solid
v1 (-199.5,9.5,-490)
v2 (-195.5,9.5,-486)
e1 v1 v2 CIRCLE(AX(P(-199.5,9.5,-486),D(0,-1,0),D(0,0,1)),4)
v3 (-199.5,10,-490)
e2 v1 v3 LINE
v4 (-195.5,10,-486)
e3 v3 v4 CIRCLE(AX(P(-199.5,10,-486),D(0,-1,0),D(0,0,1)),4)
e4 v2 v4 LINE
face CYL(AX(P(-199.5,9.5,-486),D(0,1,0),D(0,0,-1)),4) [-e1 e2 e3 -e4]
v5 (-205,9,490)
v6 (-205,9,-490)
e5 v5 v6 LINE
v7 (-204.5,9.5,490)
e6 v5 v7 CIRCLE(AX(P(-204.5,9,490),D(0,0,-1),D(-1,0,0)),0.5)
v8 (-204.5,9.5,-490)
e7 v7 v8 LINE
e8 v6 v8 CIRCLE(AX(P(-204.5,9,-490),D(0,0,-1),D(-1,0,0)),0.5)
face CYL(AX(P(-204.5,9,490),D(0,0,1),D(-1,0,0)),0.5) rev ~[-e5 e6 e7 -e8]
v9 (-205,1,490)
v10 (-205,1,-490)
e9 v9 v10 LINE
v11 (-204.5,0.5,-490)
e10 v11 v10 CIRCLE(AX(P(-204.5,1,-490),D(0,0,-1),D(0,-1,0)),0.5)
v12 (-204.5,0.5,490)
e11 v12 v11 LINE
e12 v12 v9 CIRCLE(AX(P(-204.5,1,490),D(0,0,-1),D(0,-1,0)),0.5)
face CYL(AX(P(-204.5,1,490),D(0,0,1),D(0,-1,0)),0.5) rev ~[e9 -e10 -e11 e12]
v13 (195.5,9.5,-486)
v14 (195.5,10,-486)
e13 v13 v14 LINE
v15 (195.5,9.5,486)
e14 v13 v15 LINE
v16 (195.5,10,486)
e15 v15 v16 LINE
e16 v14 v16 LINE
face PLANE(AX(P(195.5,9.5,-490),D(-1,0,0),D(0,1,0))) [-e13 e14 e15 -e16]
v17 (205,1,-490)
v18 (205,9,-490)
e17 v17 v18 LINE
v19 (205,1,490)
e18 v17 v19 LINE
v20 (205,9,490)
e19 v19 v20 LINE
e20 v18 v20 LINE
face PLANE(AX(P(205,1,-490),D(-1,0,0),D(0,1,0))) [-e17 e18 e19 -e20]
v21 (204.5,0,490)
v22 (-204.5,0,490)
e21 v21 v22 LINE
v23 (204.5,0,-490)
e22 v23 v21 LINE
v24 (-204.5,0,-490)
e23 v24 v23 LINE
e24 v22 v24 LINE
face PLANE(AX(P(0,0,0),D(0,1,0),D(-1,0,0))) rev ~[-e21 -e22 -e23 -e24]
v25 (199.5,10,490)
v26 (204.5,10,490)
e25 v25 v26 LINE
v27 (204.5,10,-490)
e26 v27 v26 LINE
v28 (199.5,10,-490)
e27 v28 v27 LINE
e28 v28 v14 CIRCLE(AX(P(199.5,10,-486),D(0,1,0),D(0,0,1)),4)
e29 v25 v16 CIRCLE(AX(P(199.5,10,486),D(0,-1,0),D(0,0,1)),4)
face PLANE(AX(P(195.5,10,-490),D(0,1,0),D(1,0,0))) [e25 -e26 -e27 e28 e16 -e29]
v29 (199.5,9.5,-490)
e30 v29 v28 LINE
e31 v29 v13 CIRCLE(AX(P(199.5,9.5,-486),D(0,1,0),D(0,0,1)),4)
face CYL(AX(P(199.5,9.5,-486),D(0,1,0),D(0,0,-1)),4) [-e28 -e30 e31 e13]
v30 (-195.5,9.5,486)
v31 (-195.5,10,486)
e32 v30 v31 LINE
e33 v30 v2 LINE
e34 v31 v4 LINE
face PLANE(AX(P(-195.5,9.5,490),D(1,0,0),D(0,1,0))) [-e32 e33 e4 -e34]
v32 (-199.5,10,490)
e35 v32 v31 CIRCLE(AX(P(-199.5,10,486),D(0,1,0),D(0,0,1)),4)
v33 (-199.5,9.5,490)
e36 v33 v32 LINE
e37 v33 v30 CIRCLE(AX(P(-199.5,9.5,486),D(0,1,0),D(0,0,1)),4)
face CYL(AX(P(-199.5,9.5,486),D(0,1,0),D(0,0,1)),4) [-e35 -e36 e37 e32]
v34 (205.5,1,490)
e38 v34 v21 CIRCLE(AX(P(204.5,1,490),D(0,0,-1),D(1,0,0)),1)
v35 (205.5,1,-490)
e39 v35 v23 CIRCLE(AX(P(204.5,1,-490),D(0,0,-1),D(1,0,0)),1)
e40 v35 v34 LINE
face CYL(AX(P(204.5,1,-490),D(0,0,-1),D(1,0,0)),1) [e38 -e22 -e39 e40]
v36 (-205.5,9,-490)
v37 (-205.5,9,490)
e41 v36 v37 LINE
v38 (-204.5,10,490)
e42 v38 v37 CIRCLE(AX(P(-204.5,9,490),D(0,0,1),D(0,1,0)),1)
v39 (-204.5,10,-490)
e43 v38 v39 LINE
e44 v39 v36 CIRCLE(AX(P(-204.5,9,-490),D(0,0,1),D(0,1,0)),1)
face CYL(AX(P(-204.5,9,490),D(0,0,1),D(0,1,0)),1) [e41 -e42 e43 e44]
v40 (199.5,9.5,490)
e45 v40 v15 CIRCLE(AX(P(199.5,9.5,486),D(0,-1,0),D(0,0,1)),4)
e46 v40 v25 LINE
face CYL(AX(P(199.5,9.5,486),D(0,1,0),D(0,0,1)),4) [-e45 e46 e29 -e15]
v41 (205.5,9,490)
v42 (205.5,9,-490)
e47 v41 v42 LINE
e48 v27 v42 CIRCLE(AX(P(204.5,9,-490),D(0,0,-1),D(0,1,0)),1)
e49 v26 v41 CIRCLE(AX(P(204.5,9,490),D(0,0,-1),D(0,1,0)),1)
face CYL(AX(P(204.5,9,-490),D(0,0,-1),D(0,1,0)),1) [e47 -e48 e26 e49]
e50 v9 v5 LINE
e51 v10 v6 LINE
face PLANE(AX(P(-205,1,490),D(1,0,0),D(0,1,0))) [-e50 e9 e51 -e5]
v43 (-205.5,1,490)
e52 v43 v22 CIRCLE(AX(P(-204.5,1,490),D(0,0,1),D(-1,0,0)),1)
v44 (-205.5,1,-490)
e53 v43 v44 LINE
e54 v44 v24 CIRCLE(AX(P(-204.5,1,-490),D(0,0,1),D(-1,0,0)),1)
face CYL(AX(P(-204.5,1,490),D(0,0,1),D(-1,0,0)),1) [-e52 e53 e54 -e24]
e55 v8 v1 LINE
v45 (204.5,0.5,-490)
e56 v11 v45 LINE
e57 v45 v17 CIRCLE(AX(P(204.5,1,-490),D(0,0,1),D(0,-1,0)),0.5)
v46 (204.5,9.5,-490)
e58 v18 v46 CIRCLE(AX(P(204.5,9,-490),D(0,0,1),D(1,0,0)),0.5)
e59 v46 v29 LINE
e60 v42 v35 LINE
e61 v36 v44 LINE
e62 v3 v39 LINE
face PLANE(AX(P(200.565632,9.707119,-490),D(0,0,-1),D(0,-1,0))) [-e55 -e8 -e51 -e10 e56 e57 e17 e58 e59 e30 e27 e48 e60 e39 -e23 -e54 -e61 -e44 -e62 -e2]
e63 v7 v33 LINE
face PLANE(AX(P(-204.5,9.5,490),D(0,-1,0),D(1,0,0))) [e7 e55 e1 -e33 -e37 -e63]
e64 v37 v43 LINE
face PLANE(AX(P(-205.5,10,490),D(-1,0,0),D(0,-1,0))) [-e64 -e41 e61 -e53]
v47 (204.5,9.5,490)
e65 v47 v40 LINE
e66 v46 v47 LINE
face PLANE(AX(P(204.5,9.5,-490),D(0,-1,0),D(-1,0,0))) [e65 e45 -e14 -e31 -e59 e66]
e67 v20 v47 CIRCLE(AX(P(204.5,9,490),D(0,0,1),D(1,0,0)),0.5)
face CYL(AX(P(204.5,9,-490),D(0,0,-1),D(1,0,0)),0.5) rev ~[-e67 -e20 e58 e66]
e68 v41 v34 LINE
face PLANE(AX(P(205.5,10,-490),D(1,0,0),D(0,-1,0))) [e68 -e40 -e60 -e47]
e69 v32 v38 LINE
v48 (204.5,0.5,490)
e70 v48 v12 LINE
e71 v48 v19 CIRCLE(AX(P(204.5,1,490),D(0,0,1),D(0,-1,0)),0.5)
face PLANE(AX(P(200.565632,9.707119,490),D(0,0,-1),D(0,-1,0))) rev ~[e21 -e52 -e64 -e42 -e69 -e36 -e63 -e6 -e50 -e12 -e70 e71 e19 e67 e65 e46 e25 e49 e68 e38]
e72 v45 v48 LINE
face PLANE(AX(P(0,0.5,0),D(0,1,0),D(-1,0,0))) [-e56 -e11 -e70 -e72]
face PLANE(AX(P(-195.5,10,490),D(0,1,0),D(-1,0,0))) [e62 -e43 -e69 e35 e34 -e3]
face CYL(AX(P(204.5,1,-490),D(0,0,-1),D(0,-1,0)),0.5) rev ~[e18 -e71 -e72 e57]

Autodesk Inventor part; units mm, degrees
ref_plane "YZ Plane" through (0, 0, 0) normal (1, 0, 0) x (0, 1, 0)
ref_plane "XZ Plane" through (0, 0, 0) normal (0, 1, 0) x (-1, 0, 0)
ref_plane "XY Plane" through (0, 0, 0) normal (0, 0, 1) x (1, 0, 0)
sketch "Sketch6" plane through (0, 0, 0) normal (0, 1, 0) x (-1, 0, 0)
  line L0 (205.5, -490) -> (-205.5, -490)
  line L1 (-205.5, -490) -> (-205.5, 490)
  line L2 (-205.5, 490) -> (205.5, 490)
  line L3 (205.5, 490) -> (205.5, -490)
  line L4 (205.5, -490) -> (-205.5, 490) construction
  line L5 (-205.5, -490) -> (205.5, 490) construction
  point P0 (0, 0)
  dimension "d52" = 411
  dimension "d53" = 980
extrude "Plate2" add sketch "Sketch6" along normal blind 0.5
sketch "Sketch11" plane through (-205, 0, 490) normal (-1, 0, 0) x (0, -1, 0)
  line L0 (0, -980) -> (0, 0)
  line L1 (0, 0) -> (-10, 0)
  line L2 (-10, 0) -> (-10, -980)
  line L3 (-10, -980) -> (0, -980)
edge flange "Flange2" height 10 angle 90 thickness 0.5 bend radius 0.5 thickness toward (-1, 0, 0) relief tear relief width 0.5 relief depth 0.25 edges at (-205.5, 0.5, 0) wall of the first edge with corners at (-205, 0, -490) (-205, 0, 490) (-205, 10, 490) (-205, 10, -490)
bend "Bend3"
corner "Corner3"
sketch "Sketch12" plane through (-205.5, 9.5, 490) normal (0, 1, 0) x (-1, 0, 0)
  line L0 (0, -980) -> (0, 0)
  line L1 (0, 0) -> (-10, 0)
  line L2 (-10, 0) -> (-10, -980)
  line L3 (-10, -980) -> (0, -980)
edge flange "Flange3" height 10 angle 90 thickness 0.5 bend radius 0.5 thickness toward (0, 1, 0) relief tear relief width 0.5 relief depth 0.25 edges at (-205, 10, 0) wall of the first edge with corners at (-205.5, 9.5, -490) (-205.5, 9.5, 490) (-195.5, 9.5, 490) (-195.5, 9.5, -490)
bend "Bend4"
corner "Corner4"
sketch "Sketch13" plane through (205, 0, -490) normal (1, 0, 0) x (0, 1, 0)
  line L0 (0, 980) -> (0, 0)
  line L1 (0, 0) -> (10, 0)
  line L2 (10, 0) -> (10, 980)
  line L3 (10, 980) -> (0, 980)
edge flange "Flange4" height 10 angle 90 thickness 0.5 bend radius 0.5 thickness toward (1, 0, 0) relief tear relief width 0.5 relief depth 0.25 edges at (205.5, 0.5, 0) wall of the first edge with corners at (205, 0, 490) (205, 0, -490) (205, 10, -490) (205, 10, 490)
bend "Bend5"
corner "Corner5"
sketch "Sketch14" plane through (205.5, 9.5, -490) normal (0, 1, 0) x (-1, 0, 0)
  line L0 (0, 980) -> (0, 0)
  line L1 (0, 0) -> (10, 0)
  line L2 (10, 0) -> (10, 980)
  line L3 (10, 980) -> (0, 980)
edge flange "Flange5" height 10 angle 90 thickness 0.5 bend radius 0.5 thickness toward (0, 1, 0) relief tear relief width 0.5 relief depth 0.25 edges at (205, 10, 0) wall of the first edge with corners at (205.5, 9.5, 490) (205.5, 9.5, -490) (195.5, 9.5, -490) (195.5, 9.5, 490)
bend "Bend6"
corner "Corner6"
fillet "Corner Round1" radius 4 4 edges at (195.5, 9.75, -490) (-195.5, 9.75, -490) (-195.5, 9.75, 490) (195.5, 9.75, 490)
equation "\"d52\" = ЖАБРЫ_базовая_ширина - 5 * ЖАБРЫ_шаг_листов"
equation "\"d53\" = ЖАБРЫ_базовая_длина_кор_лист"
equation "\"d54\" = Thickness"
equation "\"d84\" = BendReliefWidth"
equation "\"d85\" = BendReliefDepth"
equation "\"d86\" = MinimumRemnant"
equation "\"d87\" = TransitionRadius"
equation "\"d90\" = BendRadius"
equation "\"d91\" = CornerReliefSize"
equation "\"d92\" = GapSize"
equation "\"d93\" = JacobiRadiusSize"
equation "\"d94\" = BendReliefWidth"
equation "\"d95\" = BendReliefDepth"
equation "\"d96\" = MinimumRemnant"
equation "\"d97\" = TransitionRadius"
equation "\"d100\" = BendRadius"
equation "\"d101\" = CornerReliefSize"
equation "\"d102\" = GapSize"
equation "\"d103\" = JacobiRadiusSize"
equation "\"d104\" = BendReliefWidth"
equation "\"d105\" = BendReliefDepth"
equation "\"d106\" = MinimumRemnant"
equation "\"d107\" = TransitionRadius"
equation "\"d110\" = BendRadius"
equation "\"d111\" = CornerReliefSize"
equation "\"d112\" = GapSize"
equation "\"d113\" = JacobiRadiusSize"
equation "\"d114\" = BendReliefWidth"
equation "\"d115\" = BendReliefDepth"
equation "\"d116\" = MinimumRemnant"
equation "\"d117\" = TransitionRadius"
equation "\"d120\" = BendRadius"
equation "\"d121\" = CornerReliefSize"
equation "\"d122\" = GapSize"
equation "\"d123\" = JacobiRadiusSize"
equation "\"BendRadius\" = Thickness"
equation "\"BendReliefWidth\" = Thickness"
equation "\"BendReliefDepth\" = 0.5 * Thickness"
equation "\"CornerReliefSize\" = 4 * Thickness"
equation "\"MinimumRemnant\" = 2 * Thickness"
equation "\"TransitionRadius\" = BendRadius"
equation "\"JacobiRadiusSize\" = BendRadius"
equation "\"GapSize\" = Thickness"
equation "\"ЖАБРЫ_базовая_ширина\" = 915"
equation "\"ЖАБРЫ_шаг_листов\" = 100.8"
equation "\"ЖАБРЫ_базовая_длина_кор_лист\" = 980"
equation "\"Thickness\" = 0.5"
properties part number "MSC 809 SHEET GILLS" material "Stainless Steel"
